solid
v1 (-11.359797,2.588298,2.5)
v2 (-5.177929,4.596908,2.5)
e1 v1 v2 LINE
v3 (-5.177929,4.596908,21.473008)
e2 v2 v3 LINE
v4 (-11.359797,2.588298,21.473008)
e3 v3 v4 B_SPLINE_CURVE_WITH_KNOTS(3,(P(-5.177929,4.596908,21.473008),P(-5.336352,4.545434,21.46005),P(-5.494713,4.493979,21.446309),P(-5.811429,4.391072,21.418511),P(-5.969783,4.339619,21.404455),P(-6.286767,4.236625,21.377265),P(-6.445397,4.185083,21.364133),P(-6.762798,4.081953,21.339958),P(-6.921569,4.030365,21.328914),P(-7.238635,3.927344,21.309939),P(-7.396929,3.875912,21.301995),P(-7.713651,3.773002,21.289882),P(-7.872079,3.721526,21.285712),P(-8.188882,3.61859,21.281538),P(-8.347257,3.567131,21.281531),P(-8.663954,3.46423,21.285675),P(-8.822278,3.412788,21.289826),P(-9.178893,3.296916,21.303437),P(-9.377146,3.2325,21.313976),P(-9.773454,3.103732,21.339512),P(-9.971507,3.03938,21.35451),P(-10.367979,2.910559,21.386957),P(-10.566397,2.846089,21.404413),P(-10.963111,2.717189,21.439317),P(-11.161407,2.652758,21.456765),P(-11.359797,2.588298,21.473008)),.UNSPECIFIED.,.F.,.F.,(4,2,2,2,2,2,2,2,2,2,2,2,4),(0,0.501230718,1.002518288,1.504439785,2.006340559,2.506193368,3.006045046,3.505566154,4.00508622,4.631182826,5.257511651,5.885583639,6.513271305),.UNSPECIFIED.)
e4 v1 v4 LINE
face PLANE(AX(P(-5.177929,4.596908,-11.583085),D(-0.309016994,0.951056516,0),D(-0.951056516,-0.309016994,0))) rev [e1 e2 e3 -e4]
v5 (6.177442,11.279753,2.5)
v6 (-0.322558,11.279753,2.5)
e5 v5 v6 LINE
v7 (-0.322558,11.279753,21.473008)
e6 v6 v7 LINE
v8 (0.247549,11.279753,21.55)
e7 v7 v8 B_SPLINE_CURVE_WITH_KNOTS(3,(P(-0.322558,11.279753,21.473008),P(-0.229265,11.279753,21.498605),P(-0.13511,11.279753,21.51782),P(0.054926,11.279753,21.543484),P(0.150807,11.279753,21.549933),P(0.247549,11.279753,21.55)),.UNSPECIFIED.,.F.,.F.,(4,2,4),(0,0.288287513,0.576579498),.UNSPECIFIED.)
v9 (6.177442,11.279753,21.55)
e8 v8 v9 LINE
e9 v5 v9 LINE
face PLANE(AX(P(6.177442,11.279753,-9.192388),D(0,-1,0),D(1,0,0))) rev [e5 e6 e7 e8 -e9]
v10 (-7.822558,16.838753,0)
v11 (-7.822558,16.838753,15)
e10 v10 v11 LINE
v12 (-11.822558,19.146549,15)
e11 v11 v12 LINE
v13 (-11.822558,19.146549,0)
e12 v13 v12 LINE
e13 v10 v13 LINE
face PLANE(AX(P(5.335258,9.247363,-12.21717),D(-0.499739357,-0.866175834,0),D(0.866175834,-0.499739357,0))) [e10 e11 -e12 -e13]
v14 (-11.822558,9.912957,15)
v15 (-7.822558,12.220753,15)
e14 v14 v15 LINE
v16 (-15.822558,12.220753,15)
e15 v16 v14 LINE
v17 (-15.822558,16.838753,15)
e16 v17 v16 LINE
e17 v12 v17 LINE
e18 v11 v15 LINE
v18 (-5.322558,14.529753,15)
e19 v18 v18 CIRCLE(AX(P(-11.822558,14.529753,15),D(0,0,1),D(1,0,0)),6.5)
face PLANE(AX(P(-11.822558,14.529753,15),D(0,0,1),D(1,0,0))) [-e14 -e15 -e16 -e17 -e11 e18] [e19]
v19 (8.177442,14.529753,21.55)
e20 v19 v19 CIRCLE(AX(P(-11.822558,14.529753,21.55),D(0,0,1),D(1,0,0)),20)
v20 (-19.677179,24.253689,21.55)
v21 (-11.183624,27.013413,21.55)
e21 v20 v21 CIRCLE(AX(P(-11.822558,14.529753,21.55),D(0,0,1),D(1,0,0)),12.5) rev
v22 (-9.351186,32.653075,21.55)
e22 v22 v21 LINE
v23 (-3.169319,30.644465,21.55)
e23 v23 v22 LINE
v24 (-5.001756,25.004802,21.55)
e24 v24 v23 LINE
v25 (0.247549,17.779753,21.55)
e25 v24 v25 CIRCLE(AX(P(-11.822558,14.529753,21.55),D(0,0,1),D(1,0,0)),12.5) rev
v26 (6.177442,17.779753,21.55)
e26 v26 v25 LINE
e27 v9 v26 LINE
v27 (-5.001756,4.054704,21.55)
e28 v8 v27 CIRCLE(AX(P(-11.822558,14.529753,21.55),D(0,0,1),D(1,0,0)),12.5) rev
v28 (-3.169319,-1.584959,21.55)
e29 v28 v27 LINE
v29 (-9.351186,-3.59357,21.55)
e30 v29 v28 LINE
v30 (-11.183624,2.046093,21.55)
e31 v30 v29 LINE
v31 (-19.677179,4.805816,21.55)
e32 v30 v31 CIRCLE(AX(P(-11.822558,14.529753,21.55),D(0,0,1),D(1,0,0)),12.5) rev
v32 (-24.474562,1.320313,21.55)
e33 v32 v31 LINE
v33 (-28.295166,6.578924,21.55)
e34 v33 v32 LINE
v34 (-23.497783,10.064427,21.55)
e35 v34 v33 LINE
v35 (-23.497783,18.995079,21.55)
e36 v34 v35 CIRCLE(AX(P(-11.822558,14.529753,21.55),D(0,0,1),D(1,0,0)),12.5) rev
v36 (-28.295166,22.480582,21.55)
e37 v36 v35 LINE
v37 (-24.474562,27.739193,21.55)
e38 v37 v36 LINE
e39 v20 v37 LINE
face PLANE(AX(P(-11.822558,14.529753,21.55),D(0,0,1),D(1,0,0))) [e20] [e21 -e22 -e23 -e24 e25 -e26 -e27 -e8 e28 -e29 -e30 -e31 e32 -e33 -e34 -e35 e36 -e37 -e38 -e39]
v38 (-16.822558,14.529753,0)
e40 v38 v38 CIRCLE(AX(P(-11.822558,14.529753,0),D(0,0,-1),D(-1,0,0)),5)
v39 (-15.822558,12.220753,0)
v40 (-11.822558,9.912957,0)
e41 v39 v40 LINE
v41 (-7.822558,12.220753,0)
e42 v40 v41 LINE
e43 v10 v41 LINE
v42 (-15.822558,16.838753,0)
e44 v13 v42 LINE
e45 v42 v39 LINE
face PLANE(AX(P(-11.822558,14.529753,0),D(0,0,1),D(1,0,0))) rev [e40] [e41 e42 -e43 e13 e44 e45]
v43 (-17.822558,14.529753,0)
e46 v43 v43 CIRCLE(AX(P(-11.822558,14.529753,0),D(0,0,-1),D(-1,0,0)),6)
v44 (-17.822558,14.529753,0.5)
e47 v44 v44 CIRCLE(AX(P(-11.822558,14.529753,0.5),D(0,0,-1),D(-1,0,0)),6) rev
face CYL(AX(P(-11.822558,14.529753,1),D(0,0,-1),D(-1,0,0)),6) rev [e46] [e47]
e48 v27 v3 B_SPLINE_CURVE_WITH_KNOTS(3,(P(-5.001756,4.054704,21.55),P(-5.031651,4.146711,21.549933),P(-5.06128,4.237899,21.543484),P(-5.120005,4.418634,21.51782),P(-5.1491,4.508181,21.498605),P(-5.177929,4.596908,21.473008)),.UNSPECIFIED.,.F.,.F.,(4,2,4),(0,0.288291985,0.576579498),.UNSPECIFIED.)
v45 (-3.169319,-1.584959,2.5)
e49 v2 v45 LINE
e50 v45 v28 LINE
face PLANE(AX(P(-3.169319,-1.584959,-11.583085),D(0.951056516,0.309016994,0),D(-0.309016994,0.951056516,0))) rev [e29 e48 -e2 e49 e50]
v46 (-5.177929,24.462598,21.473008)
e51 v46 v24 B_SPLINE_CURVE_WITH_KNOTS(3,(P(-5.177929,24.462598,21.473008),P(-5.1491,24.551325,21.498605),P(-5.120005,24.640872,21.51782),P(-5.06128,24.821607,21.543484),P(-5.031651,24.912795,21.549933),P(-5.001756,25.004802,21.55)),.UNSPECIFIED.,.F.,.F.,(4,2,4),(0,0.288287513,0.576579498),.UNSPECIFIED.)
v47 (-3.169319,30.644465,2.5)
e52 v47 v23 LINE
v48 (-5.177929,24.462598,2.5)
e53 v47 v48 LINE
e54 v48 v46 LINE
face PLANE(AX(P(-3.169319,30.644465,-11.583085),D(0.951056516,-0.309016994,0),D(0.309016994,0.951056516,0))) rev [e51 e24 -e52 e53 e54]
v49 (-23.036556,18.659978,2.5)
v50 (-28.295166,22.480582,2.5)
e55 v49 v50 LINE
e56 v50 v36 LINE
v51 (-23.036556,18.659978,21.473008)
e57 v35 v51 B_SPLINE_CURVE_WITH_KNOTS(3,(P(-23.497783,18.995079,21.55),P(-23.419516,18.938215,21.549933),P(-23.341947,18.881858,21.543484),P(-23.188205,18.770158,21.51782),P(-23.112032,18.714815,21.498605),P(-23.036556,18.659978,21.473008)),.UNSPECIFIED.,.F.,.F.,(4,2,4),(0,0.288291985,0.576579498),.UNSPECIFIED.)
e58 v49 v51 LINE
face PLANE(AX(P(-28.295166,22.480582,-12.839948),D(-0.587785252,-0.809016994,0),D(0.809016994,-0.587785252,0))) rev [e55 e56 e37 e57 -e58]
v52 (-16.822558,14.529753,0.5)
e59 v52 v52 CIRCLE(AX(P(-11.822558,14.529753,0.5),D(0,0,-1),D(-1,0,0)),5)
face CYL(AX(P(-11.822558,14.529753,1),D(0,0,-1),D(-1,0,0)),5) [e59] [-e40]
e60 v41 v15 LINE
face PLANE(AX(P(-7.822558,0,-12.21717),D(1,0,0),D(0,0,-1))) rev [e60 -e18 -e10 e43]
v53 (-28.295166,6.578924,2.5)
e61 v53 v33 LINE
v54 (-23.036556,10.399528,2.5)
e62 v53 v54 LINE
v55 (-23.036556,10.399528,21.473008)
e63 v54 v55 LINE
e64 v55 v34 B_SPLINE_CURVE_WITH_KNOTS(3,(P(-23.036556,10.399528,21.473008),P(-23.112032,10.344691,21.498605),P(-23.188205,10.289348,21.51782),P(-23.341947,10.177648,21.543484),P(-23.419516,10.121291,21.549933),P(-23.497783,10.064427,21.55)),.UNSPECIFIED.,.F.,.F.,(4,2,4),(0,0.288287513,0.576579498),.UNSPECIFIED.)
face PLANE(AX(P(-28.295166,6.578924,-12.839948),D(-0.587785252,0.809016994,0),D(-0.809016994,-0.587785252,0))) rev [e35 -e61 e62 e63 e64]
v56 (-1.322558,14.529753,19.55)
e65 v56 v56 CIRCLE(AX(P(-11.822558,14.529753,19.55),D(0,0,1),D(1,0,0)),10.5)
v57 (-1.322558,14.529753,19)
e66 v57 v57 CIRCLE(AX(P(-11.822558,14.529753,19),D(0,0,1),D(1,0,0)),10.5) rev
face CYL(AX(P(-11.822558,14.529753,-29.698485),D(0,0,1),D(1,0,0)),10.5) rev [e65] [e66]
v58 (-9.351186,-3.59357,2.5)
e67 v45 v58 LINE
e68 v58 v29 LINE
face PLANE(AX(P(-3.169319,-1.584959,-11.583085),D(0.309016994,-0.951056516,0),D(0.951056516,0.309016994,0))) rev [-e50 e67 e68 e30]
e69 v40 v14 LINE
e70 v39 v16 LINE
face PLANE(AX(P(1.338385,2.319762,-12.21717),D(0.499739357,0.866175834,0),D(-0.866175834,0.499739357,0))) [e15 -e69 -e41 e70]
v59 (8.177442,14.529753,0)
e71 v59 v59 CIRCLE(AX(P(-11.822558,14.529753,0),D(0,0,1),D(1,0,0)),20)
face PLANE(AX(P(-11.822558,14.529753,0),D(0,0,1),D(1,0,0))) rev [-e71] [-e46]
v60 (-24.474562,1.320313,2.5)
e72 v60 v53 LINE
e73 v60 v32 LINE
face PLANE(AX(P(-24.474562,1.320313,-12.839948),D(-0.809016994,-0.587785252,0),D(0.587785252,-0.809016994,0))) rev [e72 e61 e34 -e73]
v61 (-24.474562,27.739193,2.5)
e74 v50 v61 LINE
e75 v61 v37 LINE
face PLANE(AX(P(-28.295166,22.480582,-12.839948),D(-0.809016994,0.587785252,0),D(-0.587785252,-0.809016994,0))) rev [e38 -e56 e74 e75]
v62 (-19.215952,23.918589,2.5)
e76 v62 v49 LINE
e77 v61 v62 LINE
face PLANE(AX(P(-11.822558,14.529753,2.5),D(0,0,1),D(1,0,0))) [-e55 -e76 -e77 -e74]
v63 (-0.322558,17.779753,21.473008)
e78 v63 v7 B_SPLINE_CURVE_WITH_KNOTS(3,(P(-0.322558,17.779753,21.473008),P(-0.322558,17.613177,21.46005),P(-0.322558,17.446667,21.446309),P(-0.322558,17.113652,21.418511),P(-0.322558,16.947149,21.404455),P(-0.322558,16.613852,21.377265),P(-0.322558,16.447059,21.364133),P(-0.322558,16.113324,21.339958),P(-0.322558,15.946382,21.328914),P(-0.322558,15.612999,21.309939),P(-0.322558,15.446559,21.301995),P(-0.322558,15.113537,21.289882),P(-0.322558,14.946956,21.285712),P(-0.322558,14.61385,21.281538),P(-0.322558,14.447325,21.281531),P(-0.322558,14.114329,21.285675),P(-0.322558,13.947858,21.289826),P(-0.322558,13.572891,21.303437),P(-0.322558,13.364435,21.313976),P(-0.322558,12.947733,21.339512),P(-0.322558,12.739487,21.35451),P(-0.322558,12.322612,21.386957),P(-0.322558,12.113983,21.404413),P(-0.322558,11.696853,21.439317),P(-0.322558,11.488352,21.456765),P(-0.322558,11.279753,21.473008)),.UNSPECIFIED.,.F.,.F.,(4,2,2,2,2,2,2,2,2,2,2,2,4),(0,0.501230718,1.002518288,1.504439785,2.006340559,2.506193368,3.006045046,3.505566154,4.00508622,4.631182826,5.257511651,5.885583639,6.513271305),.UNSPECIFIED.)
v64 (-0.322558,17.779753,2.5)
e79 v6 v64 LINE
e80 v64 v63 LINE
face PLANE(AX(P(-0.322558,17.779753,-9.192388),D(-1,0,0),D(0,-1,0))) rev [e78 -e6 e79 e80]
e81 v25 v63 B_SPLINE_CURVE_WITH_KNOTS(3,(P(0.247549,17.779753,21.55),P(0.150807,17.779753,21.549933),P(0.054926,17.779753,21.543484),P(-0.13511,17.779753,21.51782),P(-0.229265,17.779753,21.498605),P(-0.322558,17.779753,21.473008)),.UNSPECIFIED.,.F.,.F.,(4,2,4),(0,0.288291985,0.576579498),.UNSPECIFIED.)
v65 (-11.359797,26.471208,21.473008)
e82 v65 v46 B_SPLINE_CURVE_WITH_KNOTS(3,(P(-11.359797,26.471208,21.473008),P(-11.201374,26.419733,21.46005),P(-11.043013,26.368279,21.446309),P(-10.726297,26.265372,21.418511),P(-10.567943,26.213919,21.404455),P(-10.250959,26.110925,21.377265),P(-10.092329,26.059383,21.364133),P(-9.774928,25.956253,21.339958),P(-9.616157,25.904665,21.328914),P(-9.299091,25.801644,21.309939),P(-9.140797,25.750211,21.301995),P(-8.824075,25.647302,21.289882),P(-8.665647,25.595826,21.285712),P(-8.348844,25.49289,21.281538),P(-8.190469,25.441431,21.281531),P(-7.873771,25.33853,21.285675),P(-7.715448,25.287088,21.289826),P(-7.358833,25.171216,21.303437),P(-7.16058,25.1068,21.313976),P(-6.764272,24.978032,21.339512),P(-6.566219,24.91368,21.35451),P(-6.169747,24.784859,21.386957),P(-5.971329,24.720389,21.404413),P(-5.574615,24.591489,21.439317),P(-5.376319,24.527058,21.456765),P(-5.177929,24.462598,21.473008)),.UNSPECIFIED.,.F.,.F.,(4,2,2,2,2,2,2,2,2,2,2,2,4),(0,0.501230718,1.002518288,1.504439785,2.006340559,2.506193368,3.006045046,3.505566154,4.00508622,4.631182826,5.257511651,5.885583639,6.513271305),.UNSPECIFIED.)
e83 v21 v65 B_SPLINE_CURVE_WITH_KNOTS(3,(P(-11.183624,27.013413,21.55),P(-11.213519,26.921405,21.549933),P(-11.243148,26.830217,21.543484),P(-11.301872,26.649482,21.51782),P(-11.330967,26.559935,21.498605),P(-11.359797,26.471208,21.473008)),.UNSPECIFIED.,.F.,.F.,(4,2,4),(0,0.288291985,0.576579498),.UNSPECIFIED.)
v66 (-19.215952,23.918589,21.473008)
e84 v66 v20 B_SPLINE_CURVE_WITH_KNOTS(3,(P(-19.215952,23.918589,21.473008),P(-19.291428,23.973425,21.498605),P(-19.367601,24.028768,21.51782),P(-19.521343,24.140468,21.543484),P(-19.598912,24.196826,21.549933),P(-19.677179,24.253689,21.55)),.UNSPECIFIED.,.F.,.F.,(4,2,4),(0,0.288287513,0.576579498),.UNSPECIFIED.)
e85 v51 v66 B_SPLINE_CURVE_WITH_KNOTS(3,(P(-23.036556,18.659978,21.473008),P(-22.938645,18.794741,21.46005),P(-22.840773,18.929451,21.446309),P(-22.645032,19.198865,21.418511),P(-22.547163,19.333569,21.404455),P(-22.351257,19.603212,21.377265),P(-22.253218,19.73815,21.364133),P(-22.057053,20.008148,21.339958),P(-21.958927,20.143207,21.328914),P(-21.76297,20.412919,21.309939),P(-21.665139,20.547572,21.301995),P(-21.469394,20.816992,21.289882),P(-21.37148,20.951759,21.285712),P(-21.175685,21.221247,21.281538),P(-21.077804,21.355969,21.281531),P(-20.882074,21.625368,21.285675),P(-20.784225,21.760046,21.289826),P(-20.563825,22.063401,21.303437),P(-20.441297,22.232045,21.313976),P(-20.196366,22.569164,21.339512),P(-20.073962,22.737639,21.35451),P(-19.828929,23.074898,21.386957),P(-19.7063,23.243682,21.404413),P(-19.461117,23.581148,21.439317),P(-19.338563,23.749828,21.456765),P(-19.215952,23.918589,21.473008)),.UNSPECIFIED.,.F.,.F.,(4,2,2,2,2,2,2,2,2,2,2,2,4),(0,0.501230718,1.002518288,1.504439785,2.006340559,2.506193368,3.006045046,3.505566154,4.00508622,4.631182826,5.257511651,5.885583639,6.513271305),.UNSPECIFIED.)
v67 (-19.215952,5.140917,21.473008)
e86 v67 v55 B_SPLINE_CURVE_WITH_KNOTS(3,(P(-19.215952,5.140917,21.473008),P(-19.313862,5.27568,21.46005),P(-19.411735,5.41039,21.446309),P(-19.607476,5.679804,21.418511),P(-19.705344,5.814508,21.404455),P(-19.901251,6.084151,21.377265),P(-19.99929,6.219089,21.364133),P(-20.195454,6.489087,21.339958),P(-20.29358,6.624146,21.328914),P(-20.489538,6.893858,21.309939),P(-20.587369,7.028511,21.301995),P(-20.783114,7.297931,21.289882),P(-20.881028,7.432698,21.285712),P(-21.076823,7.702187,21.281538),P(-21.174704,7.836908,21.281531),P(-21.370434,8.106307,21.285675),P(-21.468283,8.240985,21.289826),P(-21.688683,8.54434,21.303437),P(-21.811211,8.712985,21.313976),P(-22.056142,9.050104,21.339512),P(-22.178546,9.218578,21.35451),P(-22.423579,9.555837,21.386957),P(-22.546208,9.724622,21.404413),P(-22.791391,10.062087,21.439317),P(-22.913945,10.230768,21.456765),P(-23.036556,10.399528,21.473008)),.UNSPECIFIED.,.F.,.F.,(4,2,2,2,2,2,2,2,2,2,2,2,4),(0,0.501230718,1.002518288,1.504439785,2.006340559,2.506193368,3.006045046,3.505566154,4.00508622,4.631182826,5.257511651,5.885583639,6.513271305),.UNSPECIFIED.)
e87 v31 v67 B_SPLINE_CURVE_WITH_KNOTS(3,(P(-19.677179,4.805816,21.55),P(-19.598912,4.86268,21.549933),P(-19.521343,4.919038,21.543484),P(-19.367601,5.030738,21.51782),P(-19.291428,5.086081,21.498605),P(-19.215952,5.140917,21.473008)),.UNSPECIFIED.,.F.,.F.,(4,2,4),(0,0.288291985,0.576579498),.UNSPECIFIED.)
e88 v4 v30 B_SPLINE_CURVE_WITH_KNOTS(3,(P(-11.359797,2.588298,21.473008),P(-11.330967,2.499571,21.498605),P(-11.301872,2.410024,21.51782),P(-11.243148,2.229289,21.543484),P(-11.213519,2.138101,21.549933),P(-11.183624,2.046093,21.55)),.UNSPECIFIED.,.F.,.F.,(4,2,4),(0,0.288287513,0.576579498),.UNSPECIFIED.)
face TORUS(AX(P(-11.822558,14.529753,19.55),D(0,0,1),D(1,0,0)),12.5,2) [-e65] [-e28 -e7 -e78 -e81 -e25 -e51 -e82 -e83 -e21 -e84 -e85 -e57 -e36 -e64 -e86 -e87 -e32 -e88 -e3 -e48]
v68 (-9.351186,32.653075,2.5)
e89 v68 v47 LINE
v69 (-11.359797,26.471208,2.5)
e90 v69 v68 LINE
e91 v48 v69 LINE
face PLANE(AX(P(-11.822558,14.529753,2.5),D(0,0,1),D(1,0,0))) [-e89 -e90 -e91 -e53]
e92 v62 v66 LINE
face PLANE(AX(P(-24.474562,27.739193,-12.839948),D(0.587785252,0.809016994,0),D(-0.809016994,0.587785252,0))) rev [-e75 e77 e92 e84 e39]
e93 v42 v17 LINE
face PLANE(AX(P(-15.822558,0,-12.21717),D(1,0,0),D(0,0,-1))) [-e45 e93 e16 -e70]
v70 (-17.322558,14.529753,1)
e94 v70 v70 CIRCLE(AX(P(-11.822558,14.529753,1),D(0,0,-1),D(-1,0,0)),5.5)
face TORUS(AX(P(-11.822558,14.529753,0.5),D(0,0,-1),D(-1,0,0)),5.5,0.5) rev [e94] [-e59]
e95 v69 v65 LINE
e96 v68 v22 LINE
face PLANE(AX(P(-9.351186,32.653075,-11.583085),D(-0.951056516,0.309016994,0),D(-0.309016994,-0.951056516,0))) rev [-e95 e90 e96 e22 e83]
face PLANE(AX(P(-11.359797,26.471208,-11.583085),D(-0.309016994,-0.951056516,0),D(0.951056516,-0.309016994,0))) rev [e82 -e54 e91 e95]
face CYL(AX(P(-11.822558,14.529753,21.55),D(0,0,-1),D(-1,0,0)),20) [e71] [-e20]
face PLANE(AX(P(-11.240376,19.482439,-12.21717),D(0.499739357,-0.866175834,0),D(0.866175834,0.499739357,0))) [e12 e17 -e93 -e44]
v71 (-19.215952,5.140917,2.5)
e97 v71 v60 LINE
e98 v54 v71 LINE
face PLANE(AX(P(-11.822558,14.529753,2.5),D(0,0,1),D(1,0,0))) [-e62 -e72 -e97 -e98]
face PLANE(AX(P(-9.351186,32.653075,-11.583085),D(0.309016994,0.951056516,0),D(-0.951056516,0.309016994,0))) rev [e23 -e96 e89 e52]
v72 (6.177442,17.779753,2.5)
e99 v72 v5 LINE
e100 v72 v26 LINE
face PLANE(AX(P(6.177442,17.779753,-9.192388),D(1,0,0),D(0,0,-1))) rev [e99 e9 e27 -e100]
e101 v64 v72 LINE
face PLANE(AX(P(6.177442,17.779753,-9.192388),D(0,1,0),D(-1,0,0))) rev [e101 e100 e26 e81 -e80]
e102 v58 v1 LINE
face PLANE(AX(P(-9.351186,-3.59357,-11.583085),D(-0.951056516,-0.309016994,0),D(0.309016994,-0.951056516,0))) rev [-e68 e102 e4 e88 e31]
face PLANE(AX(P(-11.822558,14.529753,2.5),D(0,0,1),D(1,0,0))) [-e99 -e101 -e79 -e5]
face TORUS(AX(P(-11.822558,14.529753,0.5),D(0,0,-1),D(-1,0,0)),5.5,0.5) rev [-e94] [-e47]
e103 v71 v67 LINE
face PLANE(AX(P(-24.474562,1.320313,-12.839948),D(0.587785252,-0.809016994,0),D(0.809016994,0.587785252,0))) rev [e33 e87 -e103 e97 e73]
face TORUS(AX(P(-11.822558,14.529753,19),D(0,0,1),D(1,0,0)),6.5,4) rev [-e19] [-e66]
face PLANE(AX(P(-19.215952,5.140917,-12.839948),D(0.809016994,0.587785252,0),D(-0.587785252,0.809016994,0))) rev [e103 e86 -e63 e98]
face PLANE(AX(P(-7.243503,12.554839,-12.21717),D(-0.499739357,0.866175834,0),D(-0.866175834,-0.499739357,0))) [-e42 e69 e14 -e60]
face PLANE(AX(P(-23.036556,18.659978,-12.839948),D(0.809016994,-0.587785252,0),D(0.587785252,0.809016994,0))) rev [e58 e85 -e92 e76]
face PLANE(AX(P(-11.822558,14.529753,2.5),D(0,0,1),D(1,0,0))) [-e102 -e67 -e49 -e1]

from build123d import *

# Parameters (mm, degrees)
SKETCH1_R                       = 20
SKETCH1_R_2                     = 1
BOSS_EXTRUDE1_DEPTH             = 21.55
TAP_DRILL_FOR_M5X0_8_TAP1_D     = 4.2
TAP_DRILL_FOR_M5X0_8_TAP1_DEPTH = 5
TAP_DRILL_FOR_M5X0_8_TAP1_TIP   = 1.2618073
SKETCH4_W                       = 6.5
SKETCH4_H                       = 6.5
CUT_EXTRUDE1_DEPTH              = 19.05
CIRPATTERN1_COUNT               = 5
SKETCH5_R                       = 6
SKETCH5_R_2                     = 5
CUT_EXTRUDE2_DEPTH              = 1
FILLET3_R                       = 0.5
CUT_EXTRUDE3_START              = -21.55
SKETCH6_W                       = 8
SKETCH6_H                       = 4.618
SKETCH6_R                       = 2.1
CUT_EXTRUDE3_DEPTH              = 21.55
SKETCH7_R                       = 10.5
CUT_EXTRUDE4_DEPTH              = 6.55
FILLET4_R                       = 2
FILLET5_R                       = 4


# Some blends are built 0.0001 mm under size
with BuildPart() as part:
    # Sketch1 → Boss-Extrude1 (new body)
    with BuildSketch(Plane.XY):
        with Locations((-11.822558412, 14.529752947)):
            Circle(SKETCH1_R)
        with Locations((-11.822558412, 14.529752947)):
            Circle(SKETCH1_R_2, mode=Mode.SUBTRACT)
    extrude(amount=BOSS_EXTRUDE1_DEPTH)

    # Tap Drill for M5x0.8 Tap1
    with Locations(Plane.XY.offset(21.55)):
        with Locations((-11.822558412, 14.529752947)):
            Hole(TAP_DRILL_FOR_M5X0_8_TAP1_D / 2, depth=TAP_DRILL_FOR_M5X0_8_TAP1_DEPTH)
            with Locations((0, 0, -(TAP_DRILL_FOR_M5X0_8_TAP1_DEPTH + TAP_DRILL_FOR_M5X0_8_TAP1_TIP / 2))):  # 118° drill point
                Cone(0, TAP_DRILL_FOR_M5X0_8_TAP1_D / 2, TAP_DRILL_FOR_M5X0_8_TAP1_TIP, mode=Mode.SUBTRACT)

    # Sketch4 → Cut-Extrude1 (cut)
    with BuildSketch(Plane.XY.offset(21.55)):
        with Locations((2.927441588, 14.529752947)):
            Rectangle(SKETCH4_W, SKETCH4_H)
    cut_extrude1 = extrude(amount=-CUT_EXTRUDE1_DEPTH, mode=Mode.SUBTRACT)

    # CirPattern1: Cut-Extrude1 ×5 about axis
    cirpattern1_axis = Axis((-11.822558412, 14.529752947, 0), (0, 0, 1))
    for i in range(1, CIRPATTERN1_COUNT):
        add(cut_extrude1.rotate(cirpattern1_axis, i * 360 / CIRPATTERN1_COUNT), mode=Mode.SUBTRACT)

    # Sketch5 → Cut-Extrude2 (cut)
    with BuildSketch(Plane(origin=(0, 0, 0), x_dir=(-1, 0, 0), z_dir=(0, 0, -1))):
        with Locations((11.822558412, 14.529752947)):
            Circle(SKETCH5_R)
        with Locations((11.822558412, 14.529752947)):
            Circle(SKETCH5_R_2, mode=Mode.SUBTRACT)
    extrude(amount=-CUT_EXTRUDE2_DEPTH, mode=Mode.SUBTRACT)

    # Fillet3
    fillet3_edges = [part.edges().sort_by_distance(p)[0] for p in [
        (-5.822558412, 14.529752947, 1),
        (-6.822558412, 14.529752947, 1),
    ]]
    fillet(fillet3_edges, radius=FILLET3_R - 0.0001)  # a hair under: the kernel refuses the full size

    # Sketch6 → Cut-Extrude3 (cut)
    # profile 1 of 4: a face of its own
    with BuildSketch(Plane.XY.offset(21.55).offset(CUT_EXTRUDE3_START)):
        with Locations((-11.822558412, 14.529752947)):
            Rectangle(SKETCH6_W, SKETCH6_H)
        with Locations((-11.822558412, 14.529752947)):
            Circle(SKETCH6_R, mode=Mode.SUBTRACT)
    # profile 2 of 4: a face of its own
    with BuildSketch(Plane.XY.offset(21.55).offset(CUT_EXTRUDE3_START)):
        with Locations((-11.822558412, 14.529752947)):
            Circle(SKETCH6_R)
    # profile 3 of 4: a face of its own
    with BuildSketch(Plane.XY.offset(21.55).offset(CUT_EXTRUDE3_START)):
        Polygon((-11.822558412, 19.146549298), (-7.822558412, 16.838752947), (-15.822558412, 16.838752947), align=None)
    # profile 4 of 4: a face of its own
    with BuildSketch(Plane.XY.offset(21.55).offset(CUT_EXTRUDE3_START)):
        Polygon((-11.822558412, 9.912956595), (-15.822558412, 12.220752947), (-7.822558412, 12.220752947), align=None)
    extrude(amount=CUT_EXTRUDE3_DEPTH, mode=Mode.SUBTRACT)

    # Sketch7 → Cut-Extrude4 (cut)
    with BuildSketch(Plane.XY.offset(21.55)):
        with Locations((-11.822558412, 14.529752947)):
            Circle(SKETCH7_R)
    extrude(amount=-CUT_EXTRUDE4_DEPTH, mode=Mode.SUBTRACT)

    # Fillet4
    # the kernel refuses this fillet: 2 mm, written as the material it takes off along each edge
    with BuildSketch(Plane(origin=(-11.822558412, 14.529752947, 21.55), x_dir=(1, 0, 0), z_dir=(0, -1, 0))) as fillet4_piece_1:
        with BuildLine():
            CenterArc((10.5 + FILLET4_R, -FILLET4_R), FILLET4_R, 90, 90)
            Line((10.5, -FILLET4_R), (10.5, 0))
            Line((10.5, 0), (10.5 + FILLET4_R, 0))
        make_face()
    revolve(axis=Axis((-11.822558412, 14.529752947, 21.55), (0, 0, 1)), mode=Mode.SUBTRACT)

    # Fillet5
    fillet5_edges = [part.edges().sort_by_distance(p)[0] for p in [
        (-22.322558412, 14.529752947, 15),
    ]]
    fillet(fillet5_edges, radius=FILLET5_R)


solid = part.part
